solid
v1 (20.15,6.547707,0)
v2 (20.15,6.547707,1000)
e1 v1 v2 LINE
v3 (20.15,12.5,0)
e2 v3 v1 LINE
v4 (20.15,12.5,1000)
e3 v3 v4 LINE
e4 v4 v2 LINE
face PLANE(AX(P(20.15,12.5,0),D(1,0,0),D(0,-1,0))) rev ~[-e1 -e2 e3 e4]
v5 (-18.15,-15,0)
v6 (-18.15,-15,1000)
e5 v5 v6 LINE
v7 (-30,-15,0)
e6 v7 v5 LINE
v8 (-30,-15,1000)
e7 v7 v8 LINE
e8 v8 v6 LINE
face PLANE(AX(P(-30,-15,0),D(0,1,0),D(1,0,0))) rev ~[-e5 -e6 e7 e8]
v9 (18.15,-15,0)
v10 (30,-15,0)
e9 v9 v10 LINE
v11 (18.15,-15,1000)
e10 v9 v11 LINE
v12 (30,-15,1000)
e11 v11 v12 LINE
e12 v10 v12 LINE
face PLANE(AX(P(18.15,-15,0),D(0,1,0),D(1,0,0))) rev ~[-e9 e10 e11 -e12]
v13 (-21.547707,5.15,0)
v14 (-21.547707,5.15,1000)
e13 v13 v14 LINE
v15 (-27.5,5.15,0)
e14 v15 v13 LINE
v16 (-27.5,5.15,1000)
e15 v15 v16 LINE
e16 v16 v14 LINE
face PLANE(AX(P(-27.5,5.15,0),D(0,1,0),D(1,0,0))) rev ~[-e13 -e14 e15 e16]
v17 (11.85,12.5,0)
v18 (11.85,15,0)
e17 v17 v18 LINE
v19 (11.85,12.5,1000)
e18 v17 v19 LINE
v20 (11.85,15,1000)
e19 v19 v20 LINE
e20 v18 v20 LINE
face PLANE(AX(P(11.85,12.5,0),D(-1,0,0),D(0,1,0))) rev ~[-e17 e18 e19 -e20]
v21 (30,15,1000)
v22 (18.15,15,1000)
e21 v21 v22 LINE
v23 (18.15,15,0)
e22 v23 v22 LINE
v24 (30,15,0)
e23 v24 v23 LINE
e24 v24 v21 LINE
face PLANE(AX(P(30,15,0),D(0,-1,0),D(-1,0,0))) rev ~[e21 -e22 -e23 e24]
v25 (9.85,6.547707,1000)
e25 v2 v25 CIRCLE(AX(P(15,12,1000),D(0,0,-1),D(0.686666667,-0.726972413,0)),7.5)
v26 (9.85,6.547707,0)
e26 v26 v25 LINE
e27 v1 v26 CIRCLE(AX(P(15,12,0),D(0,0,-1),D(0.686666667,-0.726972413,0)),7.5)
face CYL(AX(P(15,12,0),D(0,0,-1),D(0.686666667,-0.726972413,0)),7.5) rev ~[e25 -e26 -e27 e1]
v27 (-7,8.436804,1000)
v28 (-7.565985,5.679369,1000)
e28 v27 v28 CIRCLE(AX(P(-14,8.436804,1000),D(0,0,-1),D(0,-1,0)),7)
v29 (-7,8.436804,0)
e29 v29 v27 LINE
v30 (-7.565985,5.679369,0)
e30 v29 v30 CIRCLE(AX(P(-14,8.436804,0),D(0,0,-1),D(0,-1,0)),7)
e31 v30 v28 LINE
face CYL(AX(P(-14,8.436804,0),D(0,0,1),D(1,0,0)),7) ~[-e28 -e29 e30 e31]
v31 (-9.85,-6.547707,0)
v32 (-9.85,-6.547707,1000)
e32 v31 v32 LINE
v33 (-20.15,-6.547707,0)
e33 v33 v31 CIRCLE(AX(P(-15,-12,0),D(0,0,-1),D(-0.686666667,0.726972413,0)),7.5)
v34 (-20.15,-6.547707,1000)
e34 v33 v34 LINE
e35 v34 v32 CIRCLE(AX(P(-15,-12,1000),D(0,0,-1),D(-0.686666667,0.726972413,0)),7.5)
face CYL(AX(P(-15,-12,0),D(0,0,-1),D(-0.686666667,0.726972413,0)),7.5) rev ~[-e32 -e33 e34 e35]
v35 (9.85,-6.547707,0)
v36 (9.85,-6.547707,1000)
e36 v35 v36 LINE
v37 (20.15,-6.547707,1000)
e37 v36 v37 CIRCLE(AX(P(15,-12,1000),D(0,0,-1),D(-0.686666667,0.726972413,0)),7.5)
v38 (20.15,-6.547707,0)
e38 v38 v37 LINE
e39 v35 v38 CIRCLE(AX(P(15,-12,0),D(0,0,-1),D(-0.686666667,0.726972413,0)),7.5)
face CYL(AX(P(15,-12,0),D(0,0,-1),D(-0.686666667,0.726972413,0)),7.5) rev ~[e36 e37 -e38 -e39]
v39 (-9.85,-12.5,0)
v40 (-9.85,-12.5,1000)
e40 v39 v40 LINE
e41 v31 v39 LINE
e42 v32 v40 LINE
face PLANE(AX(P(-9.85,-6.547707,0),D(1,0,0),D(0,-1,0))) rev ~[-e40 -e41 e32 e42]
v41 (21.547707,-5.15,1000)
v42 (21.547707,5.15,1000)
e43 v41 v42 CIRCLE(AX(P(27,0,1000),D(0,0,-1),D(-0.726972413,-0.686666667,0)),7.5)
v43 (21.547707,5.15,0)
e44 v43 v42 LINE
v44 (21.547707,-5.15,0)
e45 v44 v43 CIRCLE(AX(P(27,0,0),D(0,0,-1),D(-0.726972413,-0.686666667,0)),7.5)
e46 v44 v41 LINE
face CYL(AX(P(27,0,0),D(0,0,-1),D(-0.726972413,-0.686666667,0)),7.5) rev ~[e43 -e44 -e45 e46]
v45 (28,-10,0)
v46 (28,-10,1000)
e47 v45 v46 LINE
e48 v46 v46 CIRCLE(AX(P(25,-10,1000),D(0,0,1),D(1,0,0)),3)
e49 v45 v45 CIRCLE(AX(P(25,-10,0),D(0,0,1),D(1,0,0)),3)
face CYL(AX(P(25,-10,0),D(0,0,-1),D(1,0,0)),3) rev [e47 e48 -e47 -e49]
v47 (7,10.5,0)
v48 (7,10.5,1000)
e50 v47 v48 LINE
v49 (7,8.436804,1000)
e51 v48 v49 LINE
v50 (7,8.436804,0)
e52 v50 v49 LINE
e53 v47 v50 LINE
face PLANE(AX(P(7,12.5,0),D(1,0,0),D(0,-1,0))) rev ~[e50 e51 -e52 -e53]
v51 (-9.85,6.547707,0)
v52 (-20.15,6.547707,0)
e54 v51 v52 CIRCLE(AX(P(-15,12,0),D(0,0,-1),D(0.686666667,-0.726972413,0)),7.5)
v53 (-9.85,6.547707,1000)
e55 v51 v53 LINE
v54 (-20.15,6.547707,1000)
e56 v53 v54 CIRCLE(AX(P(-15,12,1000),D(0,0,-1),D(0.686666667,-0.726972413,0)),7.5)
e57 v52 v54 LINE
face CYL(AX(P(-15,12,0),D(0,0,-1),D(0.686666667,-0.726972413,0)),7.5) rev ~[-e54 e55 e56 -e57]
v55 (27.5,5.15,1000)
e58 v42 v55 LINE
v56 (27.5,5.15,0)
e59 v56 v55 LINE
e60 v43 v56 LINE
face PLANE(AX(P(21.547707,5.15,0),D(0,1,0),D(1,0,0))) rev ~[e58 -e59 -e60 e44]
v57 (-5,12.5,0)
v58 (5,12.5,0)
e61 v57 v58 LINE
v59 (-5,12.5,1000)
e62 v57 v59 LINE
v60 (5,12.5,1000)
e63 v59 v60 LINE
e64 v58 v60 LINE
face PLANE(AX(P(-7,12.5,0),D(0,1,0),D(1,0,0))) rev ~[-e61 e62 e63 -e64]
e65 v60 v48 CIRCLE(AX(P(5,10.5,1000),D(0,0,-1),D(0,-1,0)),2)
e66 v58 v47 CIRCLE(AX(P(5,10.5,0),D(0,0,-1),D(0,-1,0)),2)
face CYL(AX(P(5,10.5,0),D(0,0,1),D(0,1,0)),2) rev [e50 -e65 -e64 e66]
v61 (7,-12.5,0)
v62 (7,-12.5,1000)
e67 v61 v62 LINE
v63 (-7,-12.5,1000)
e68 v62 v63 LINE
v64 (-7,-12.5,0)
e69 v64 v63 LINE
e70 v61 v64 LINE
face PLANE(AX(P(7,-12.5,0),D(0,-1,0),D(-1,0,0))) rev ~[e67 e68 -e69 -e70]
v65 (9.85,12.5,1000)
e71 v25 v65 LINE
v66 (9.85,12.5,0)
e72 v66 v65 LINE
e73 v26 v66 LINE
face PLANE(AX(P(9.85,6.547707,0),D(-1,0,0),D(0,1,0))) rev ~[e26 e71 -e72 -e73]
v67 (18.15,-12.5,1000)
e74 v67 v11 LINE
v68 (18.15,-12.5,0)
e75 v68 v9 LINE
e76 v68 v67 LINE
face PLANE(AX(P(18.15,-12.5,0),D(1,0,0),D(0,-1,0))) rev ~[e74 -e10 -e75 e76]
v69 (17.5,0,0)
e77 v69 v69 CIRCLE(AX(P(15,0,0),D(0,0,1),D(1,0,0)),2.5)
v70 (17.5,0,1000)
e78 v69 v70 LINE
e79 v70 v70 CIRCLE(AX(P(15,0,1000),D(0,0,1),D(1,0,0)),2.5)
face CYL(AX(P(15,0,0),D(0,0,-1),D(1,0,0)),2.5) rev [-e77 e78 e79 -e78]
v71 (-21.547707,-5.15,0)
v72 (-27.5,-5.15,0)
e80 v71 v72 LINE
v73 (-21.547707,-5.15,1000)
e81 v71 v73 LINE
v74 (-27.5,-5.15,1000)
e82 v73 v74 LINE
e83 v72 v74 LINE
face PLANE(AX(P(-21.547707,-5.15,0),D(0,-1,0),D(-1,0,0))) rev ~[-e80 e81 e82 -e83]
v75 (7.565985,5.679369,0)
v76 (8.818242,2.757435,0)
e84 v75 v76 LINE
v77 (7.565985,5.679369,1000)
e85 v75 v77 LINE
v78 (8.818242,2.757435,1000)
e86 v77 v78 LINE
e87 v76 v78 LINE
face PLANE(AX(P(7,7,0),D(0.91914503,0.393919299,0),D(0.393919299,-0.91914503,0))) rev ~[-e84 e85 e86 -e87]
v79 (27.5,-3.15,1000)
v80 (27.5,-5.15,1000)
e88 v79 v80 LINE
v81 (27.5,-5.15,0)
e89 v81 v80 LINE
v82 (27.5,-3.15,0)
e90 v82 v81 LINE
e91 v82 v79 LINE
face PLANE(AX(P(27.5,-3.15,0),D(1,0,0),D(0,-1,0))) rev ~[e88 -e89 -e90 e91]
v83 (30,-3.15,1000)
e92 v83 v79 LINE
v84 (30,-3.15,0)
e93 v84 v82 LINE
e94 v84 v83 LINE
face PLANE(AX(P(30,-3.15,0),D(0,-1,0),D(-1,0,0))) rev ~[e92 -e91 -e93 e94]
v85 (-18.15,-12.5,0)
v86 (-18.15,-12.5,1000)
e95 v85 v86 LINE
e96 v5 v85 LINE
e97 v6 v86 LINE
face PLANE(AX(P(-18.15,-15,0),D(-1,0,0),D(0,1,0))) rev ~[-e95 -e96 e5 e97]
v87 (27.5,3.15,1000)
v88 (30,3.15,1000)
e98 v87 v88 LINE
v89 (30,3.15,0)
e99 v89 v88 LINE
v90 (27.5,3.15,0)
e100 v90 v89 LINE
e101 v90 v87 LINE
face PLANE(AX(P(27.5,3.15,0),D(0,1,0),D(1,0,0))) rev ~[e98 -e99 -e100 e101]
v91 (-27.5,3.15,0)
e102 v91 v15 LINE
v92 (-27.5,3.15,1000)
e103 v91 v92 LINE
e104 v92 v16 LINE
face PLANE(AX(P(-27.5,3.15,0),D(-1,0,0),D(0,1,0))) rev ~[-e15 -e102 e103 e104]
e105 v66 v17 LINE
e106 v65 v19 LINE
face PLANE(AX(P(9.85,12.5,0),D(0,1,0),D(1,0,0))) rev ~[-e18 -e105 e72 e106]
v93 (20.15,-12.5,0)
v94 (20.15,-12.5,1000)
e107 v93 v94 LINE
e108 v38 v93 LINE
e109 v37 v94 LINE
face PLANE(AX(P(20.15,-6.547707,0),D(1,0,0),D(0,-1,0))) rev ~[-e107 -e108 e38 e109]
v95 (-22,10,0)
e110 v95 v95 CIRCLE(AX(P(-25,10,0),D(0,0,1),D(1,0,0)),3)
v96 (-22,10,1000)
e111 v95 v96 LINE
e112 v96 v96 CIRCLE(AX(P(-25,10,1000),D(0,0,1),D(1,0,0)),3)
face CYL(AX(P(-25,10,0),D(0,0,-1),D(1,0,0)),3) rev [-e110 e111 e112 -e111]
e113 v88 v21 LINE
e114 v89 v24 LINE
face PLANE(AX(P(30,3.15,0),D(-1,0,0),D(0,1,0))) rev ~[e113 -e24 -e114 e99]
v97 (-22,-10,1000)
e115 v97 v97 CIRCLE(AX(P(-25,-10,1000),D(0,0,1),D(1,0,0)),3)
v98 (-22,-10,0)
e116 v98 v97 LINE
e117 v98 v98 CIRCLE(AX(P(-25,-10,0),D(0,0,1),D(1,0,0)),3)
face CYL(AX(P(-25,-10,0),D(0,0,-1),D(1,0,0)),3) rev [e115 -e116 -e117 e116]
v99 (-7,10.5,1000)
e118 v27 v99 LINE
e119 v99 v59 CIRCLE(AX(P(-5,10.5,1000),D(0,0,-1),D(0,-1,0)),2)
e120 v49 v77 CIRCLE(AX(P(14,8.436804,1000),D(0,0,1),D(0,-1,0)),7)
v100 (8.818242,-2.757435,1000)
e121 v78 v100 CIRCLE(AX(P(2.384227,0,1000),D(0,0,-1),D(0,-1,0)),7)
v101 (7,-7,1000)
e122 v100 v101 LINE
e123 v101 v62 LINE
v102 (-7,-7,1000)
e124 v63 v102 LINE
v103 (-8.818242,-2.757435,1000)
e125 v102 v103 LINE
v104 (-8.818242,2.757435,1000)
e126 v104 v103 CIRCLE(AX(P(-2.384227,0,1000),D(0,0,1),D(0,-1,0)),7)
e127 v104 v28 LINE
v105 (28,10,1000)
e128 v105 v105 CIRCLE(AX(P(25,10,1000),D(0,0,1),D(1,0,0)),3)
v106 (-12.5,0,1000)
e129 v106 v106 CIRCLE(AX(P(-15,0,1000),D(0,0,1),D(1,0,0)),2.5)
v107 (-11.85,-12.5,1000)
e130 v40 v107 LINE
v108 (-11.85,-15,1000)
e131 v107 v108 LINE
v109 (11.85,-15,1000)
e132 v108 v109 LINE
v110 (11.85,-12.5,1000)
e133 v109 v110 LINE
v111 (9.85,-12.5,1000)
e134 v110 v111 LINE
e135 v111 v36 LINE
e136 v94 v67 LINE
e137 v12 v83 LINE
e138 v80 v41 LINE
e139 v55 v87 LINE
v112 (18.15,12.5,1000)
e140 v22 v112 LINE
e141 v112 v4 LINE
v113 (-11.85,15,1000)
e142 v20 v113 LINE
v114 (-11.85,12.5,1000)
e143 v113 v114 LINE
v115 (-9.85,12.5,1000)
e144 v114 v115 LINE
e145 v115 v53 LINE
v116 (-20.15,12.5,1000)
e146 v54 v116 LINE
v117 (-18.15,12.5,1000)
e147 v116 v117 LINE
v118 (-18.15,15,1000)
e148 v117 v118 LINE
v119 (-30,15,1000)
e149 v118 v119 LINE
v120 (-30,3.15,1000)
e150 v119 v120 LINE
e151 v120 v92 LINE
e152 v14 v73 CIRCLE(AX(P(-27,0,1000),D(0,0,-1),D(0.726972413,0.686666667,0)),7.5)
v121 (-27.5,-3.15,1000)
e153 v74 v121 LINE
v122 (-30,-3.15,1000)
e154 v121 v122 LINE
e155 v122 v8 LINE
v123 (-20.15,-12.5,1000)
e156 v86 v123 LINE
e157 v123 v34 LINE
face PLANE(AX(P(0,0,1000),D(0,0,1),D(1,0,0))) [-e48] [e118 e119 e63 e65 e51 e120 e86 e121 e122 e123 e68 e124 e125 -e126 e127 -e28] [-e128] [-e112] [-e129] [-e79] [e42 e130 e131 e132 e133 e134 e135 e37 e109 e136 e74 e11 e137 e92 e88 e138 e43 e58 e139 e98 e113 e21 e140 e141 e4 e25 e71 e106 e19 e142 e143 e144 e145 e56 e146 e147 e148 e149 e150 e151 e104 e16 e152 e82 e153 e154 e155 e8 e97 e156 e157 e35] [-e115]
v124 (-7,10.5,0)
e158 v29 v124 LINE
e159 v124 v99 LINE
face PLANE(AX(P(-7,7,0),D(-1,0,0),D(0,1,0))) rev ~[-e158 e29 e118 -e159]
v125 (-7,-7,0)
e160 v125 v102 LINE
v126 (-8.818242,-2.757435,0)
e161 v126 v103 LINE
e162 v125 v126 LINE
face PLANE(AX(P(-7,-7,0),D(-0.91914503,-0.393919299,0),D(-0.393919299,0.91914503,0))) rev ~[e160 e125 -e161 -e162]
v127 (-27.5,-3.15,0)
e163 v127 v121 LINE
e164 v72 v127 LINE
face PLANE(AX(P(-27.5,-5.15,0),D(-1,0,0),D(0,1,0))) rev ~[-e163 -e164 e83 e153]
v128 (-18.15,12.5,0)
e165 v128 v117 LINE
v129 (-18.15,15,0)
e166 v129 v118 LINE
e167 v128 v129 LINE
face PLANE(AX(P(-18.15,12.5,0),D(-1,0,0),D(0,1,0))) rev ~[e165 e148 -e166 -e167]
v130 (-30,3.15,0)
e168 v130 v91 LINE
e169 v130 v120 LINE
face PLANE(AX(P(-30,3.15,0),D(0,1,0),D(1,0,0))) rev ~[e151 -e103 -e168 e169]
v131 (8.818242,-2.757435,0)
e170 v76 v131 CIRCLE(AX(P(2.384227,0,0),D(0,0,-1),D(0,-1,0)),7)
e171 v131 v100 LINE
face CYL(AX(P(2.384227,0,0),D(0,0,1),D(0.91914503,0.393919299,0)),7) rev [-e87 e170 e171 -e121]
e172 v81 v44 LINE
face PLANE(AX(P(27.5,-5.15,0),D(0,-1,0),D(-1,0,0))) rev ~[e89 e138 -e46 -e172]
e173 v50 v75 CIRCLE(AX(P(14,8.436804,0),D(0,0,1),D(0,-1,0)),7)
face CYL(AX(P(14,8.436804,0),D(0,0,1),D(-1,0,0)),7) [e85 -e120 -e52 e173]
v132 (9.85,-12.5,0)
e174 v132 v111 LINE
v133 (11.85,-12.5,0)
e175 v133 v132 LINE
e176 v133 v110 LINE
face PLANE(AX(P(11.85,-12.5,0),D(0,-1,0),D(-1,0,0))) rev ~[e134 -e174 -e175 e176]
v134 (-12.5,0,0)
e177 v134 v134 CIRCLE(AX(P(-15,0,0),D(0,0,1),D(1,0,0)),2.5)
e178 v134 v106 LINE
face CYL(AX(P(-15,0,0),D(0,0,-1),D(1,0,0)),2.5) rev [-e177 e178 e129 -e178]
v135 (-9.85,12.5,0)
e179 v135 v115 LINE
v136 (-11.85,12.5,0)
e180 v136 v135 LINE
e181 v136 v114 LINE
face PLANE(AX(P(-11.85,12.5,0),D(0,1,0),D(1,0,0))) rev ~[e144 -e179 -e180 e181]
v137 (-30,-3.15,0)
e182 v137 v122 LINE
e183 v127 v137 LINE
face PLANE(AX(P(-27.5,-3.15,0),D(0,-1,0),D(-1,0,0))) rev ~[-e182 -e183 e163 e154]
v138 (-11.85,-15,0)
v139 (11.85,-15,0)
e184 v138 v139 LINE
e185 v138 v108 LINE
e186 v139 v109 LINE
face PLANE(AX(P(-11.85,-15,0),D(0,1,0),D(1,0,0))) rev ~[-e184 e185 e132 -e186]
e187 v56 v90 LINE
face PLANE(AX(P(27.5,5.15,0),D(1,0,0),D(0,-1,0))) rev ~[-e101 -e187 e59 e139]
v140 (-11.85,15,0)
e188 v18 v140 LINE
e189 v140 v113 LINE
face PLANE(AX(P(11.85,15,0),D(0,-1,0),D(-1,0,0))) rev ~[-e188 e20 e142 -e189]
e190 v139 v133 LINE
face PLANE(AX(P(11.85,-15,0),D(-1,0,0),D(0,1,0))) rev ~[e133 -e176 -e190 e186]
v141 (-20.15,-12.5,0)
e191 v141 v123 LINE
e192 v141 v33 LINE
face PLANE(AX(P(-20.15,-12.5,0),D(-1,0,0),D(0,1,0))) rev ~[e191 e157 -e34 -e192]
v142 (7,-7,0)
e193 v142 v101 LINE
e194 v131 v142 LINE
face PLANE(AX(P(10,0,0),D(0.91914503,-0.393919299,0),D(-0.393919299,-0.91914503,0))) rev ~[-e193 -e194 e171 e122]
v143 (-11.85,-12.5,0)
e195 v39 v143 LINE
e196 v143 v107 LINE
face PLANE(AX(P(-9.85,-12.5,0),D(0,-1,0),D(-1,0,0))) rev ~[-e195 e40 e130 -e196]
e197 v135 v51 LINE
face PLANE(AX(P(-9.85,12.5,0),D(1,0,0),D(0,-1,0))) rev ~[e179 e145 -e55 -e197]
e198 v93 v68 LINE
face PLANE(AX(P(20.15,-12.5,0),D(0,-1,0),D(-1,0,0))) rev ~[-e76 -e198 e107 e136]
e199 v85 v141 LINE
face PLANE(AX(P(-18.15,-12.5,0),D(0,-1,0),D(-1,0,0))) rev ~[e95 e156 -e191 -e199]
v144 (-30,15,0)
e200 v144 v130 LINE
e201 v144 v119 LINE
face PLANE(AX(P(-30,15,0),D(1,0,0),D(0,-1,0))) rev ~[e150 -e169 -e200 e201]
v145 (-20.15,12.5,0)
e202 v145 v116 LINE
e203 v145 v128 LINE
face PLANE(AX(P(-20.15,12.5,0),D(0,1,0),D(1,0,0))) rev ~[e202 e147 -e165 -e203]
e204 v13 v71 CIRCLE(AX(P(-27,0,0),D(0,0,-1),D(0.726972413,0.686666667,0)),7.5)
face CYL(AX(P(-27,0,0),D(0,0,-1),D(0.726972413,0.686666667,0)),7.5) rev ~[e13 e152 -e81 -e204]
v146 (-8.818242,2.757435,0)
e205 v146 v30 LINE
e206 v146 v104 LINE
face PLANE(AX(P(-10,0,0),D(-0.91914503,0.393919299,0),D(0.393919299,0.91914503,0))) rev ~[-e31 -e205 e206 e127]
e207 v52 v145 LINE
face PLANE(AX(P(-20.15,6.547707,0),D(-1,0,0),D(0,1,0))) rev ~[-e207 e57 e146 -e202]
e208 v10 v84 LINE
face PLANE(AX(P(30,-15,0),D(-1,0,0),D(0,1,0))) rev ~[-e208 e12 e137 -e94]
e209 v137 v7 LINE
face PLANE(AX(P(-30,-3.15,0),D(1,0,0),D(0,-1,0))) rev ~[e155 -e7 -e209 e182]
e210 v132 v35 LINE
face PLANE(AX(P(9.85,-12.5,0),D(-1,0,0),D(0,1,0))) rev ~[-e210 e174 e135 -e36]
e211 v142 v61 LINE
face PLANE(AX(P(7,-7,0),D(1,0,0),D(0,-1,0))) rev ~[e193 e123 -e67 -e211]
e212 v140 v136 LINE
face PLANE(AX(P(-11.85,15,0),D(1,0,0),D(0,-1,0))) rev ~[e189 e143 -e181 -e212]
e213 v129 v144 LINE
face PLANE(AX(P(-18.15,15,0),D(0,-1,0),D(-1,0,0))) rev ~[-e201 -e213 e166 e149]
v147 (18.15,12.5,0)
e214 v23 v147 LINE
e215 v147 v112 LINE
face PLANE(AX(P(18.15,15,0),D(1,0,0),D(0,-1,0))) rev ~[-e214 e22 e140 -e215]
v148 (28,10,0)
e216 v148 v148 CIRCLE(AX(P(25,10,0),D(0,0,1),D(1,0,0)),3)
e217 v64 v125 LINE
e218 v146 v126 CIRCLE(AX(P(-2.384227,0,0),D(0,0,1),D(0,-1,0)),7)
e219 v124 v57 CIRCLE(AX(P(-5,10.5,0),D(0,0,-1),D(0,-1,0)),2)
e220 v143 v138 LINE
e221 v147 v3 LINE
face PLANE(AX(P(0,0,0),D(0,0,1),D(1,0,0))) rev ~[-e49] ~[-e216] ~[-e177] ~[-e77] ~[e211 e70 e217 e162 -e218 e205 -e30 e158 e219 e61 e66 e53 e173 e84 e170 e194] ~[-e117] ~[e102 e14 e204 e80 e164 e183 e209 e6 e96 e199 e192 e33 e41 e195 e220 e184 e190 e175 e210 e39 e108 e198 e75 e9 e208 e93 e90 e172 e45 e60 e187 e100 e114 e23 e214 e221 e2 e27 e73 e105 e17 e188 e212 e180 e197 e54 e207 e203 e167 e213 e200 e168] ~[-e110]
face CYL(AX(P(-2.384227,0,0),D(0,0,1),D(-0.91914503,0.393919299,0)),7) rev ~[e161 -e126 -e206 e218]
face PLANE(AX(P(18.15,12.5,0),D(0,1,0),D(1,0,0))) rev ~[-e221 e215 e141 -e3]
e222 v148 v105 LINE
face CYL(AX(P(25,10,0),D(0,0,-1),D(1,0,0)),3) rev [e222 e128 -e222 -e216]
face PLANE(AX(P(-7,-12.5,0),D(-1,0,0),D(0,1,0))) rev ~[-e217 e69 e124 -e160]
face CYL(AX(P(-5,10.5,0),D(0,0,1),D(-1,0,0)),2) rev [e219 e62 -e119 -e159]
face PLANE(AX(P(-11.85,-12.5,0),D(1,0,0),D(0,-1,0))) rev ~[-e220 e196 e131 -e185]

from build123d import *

# Parameters (mm, degrees)
F0_R     = 3
F0_R_2   = 2.5
F1_DEPTH = 1000
F2_R     = 2
F3_R     = 7


# Not quite as in the source:
# - a feature names something its author has since deleted; it is built from what else it names


with BuildPart() as f1:
    # F0 (on Top) → F1 (new body)
    with BuildSketch(Plane.XY):
        with BuildLine():
            Line((18.15, -15), (30, -15))
            Line((30, -15), (30, -3.15))
            Line((30, -3.15), (27.5, -3.15))
            Line((27.5, -3.15), (27.5, -5.15))
            Line((27.5, -5.15), (21.5477069044, -5.15))
            ThreePointArc((21.5477069044, -5.15), (19.5, 0), (21.5477069044, 5.15))
            Line((21.5477069044, 5.15), (27.5, 5.15))
            Line((27.5, 5.15), (27.5, 3.15))
            Line((27.5, 3.15), (30, 3.15))
            Line((30, 3.15), (30, 15))
            Line((30, 15), (18.15, 15))
            Line((18.15, 15), (18.15, 12.5))
            Line((18.15, 12.5), (20.15, 12.5))
            Line((20.15, 12.5), (20.15, 6.5477069044))
            ThreePointArc((20.15, 6.5477069044), (15, 4.5), (9.85, 6.5477069044))
            Line((9.85, 6.5477069044), (9.85, 12.5))
            Line((9.85, 12.5), (11.85, 12.5))
            Line((11.85, 12.5), (11.85, 15))
            Line((11.85, 15), (-11.85, 15))
            Line((-11.85, 15), (-11.85, 12.5))
            Line((-11.85, 12.5), (-9.85, 12.5))
            Line((-9.85, 12.5), (-9.85, 6.5477069044))
            ThreePointArc((-9.85, 6.5477069044), (-15, 4.5), (-20.15, 6.5477069044))
            Line((-20.15, 6.5477069044), (-20.15, 12.5))
            Line((-20.15, 12.5), (-18.15, 12.5))
            Line((-18.15, 12.5), (-18.15, 15))
            Line((-18.15, 15), (-30, 15))
            Line((-30, 15), (-30, 3.15))
            Line((-30, 3.15), (-27.5, 3.15))
            Line((-27.5, 3.15), (-27.5, 5.15))
            Line((-27.5, 5.15), (-21.5477069044, 5.15))
            ThreePointArc((-21.5477069044, 5.15), (-19.5, 0), (-21.5477069044, -5.15))
            Line((-21.5477069044, -5.15), (-27.5, -5.15))
            Line((-27.5, -5.15), (-27.5, -3.15))
            Line((-27.5, -3.15), (-30, -3.15))
            Line((-30, -3.15), (-30, -15))
            Line((-30, -15), (-18.15, -15))
            Line((-18.15, -15), (-18.15, -12.5))
            Line((-18.15, -12.5), (-20.15, -12.5))
            Line((-20.15, -12.5), (-20.15, -6.5477069044))
            ThreePointArc((-20.15, -6.5477069044), (-15, -4.5), (-9.85, -6.5477069044))
            Line((-9.85, -6.5477069044), (-9.85, -12.5))
            Line((-9.85, -12.5), (-11.85, -12.5))
            Line((-11.85, -12.5), (-11.85, -15))
            Line((-11.85, -15), (11.85, -15))
            Line((11.85, -15), (11.85, -12.5))
            Line((11.85, -12.5), (9.85, -12.5))
            Line((9.85, -12.5), (9.85, -6.5477069044))
            ThreePointArc((9.85, -6.5477069044), (15, -4.5), (20.15, -6.5477069044))
            Line((20.15, -6.5477069044), (20.15, -12.5))
            Line((20.15, -12.5), (18.15, -12.5))
            Line((18.15, -12.5), (18.15, -15))
        make_face()
        with Locations((-25, -10)):
            Circle(F0_R, mode=Mode.SUBTRACT)
        with Locations((25, -10)):
            Circle(F0_R, mode=Mode.SUBTRACT)
        with Locations((-15, 0)):
            Circle(F0_R_2, mode=Mode.SUBTRACT)
        with Locations((-25, 10)):
            Circle(F0_R, mode=Mode.SUBTRACT)
        Polygon((-7, 7), (-7, 12.5), (0, 12.5), (7, 12.5), (7, 7), (10, 0), (7, -7), (7, -12.5), (0, -12.5), (-7, -12.5), (-7, -7), (-10, 0), align=None, mode=Mode.SUBTRACT)
        with Locations((15, 0)):
            Circle(F0_R_2, mode=Mode.SUBTRACT)
        with Locations((25, 10)):
            Circle(F0_R, mode=Mode.SUBTRACT)
    extrude(amount=F1_DEPTH)

    # F2
    f2_edges = [f1.edges().sort_by_distance(p)[0] for p in [
        (-7, 12.5, 500),
        (7, 12.5, 500),
    ]]
    fillet(f2_edges, radius=F2_R)

    # F3
    f3_edges = [f1.edges().sort_by_distance(p)[0] for p in [
        (-7, 7, 500),
        (-10, 0, 500),
        (7, 7, 500),
        (10, 0, 500),
    ]]
    fillet(f3_edges, radius=F3_R)


solid = f1.part
